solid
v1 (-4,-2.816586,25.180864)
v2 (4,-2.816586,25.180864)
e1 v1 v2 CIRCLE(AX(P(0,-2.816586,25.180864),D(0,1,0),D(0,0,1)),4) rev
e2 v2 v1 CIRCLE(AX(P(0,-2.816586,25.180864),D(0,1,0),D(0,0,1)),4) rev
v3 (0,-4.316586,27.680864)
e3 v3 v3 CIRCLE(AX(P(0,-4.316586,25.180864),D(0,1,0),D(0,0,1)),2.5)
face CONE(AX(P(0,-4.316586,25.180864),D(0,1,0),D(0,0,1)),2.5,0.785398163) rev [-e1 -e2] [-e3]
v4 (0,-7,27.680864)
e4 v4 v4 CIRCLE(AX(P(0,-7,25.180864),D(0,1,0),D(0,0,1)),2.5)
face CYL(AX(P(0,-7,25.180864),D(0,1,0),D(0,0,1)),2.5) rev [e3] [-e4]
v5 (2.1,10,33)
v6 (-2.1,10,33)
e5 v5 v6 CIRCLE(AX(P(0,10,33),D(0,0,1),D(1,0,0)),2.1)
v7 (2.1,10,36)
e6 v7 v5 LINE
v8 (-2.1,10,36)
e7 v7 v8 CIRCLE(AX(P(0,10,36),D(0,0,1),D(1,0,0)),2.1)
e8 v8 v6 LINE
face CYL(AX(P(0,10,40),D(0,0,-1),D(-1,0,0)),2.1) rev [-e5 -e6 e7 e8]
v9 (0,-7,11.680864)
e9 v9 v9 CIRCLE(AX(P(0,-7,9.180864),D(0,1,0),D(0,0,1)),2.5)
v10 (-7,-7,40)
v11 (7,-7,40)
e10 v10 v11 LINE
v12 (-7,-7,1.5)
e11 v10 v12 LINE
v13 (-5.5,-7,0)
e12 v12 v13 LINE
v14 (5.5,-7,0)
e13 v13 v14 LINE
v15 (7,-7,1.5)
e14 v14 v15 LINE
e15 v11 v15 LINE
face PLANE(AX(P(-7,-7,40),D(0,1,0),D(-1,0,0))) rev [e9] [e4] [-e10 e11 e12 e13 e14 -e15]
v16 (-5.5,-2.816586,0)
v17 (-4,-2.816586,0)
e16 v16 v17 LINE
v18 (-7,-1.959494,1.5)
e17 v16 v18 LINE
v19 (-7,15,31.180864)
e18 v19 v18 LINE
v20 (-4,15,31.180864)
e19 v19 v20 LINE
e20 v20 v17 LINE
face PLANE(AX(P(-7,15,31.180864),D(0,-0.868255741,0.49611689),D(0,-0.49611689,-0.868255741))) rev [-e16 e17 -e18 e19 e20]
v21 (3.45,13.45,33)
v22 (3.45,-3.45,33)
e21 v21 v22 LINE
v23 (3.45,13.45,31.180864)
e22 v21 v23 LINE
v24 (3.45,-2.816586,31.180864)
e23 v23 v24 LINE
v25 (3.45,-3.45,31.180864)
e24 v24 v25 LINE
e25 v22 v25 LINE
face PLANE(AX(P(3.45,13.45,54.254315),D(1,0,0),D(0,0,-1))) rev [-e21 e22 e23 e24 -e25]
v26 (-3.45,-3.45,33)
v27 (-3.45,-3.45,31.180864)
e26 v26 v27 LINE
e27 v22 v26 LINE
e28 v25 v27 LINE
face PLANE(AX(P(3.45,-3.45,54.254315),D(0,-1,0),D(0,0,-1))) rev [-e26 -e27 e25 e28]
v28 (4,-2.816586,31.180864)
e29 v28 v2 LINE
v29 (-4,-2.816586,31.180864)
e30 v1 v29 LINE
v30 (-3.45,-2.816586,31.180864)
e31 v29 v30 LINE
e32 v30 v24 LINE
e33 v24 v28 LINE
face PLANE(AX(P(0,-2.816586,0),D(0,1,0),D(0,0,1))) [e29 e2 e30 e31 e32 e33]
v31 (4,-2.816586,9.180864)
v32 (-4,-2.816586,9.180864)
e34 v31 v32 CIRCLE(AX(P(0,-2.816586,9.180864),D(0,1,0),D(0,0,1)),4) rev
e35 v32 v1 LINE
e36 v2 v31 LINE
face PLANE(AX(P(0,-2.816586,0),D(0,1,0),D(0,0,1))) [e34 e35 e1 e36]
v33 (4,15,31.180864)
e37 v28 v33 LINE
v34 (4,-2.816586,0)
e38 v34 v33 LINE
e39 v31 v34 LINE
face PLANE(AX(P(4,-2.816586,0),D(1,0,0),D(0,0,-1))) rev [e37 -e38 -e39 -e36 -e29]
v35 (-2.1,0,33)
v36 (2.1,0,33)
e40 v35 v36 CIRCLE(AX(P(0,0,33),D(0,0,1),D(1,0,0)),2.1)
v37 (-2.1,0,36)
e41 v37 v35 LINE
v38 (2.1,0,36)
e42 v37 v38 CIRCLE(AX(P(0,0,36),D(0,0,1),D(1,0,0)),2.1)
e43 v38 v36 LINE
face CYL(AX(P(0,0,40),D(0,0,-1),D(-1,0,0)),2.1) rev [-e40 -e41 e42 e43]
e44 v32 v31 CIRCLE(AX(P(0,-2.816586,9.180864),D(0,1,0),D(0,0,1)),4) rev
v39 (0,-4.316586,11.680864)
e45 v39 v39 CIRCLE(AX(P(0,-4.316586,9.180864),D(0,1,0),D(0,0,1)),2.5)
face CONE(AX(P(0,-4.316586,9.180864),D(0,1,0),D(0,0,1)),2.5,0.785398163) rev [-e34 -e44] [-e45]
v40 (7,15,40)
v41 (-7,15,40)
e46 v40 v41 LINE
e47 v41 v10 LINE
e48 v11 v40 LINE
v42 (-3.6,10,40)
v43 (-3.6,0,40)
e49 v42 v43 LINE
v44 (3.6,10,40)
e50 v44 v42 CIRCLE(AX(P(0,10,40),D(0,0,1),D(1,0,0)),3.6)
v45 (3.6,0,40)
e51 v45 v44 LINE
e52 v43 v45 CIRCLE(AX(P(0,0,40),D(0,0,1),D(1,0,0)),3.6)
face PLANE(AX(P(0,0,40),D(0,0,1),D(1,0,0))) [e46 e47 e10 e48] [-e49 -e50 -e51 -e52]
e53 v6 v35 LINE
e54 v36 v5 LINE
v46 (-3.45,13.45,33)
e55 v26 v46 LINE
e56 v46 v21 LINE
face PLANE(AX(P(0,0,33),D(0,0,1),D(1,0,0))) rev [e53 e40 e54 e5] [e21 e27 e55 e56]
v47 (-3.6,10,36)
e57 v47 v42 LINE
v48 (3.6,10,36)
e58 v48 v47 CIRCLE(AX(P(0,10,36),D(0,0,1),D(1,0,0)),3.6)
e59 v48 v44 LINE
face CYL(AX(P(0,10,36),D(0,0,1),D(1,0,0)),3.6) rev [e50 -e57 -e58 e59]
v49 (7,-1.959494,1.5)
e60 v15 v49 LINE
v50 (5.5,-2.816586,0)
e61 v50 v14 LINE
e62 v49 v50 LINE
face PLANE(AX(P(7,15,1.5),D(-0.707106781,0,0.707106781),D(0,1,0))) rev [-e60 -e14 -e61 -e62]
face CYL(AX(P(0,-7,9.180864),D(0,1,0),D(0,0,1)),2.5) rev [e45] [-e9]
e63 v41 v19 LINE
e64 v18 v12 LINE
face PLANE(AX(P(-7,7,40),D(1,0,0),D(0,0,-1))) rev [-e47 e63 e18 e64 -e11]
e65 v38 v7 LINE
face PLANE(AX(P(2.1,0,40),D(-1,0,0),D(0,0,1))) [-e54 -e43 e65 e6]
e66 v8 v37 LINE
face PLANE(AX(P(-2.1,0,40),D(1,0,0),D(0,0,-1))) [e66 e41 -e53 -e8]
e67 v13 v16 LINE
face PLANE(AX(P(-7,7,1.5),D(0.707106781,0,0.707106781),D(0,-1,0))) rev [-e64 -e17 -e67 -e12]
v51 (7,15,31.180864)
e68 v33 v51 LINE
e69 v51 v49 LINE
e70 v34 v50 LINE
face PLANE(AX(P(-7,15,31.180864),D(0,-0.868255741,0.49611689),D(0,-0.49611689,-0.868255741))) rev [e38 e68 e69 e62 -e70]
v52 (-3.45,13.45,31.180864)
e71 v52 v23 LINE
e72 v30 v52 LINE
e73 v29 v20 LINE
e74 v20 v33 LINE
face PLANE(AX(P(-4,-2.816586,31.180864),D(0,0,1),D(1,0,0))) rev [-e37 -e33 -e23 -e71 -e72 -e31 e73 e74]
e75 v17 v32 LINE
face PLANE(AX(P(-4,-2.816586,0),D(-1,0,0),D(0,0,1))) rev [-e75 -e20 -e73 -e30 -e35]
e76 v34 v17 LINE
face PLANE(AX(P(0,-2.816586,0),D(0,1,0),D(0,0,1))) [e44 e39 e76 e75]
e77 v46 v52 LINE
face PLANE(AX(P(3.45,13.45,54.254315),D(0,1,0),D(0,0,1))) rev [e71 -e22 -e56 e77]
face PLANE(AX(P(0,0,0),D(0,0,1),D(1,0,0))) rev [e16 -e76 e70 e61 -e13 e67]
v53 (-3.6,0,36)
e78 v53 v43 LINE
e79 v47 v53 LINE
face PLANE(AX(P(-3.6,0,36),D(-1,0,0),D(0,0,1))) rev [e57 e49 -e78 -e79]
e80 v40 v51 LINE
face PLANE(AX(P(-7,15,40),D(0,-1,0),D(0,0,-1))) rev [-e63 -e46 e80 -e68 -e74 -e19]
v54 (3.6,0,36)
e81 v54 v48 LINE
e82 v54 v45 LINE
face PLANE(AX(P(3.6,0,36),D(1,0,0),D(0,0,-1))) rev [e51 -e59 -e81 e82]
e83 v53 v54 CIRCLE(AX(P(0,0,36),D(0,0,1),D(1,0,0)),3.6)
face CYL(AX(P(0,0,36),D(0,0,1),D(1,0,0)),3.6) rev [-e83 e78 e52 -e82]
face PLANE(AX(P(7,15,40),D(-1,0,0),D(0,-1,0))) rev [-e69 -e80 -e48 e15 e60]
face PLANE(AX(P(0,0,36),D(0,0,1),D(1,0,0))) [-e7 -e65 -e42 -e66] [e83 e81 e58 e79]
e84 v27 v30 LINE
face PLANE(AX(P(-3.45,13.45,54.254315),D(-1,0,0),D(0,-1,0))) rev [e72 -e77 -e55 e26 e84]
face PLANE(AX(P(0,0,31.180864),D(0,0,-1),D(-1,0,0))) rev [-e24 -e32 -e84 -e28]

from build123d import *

# Parameters (mm, degrees)
SALIENTE_EXTRUIR1_DEPTH = 40
CORTAR_EXTRUIR1_DEPTH   = 4
CORTAR_EXTRUIR2_DEPTH   = 45.955533586
CROQUIS4_W              = 8
CROQUIS4_H              = 31.180864131
CORTAR_EXTRUIR3_DEPTH   = 17.81659
CROQUIS5_W              = 6.9
CROQUIS5_H              = 16.9
CORTAR_EXTRUIR4_DEPTH   = 1.819135869
CROQUIS6_R              = 2.5
CORTAR_EXTRUIR5_DEPTH   = 45.34445566
CHAFL_N1_SIZE           = 1.5
CHAFL_N2_SIZE           = 1.5


with BuildPart() as part:
    # Croquis1 → Saliente-Extruir1 (new body)
    with BuildSketch(Plane.XY):
        Polygon((-7, 7), (-7, 15), (7, 15), (7, 7), (7, -7), (-7, -7), align=None)
        with BuildLine():
            Line((-2.1, 0), (-2.1, 10))
            ThreePointArc((-2.1, 10), (0, 12.1), (2.1, 10))
            Line((2.1, 10), (2.1, 0))
            ThreePointArc((2.1, 0), (0, -2.1), (-2.1, 0))
        make_face(mode=Mode.SUBTRACT)
    extrude(amount=SALIENTE_EXTRUIR1_DEPTH)

    # Croquis2 → Cortar-Extruir1 (cut)
    with BuildSketch(Plane.XY.offset(40)):
        with BuildLine():
            Line((-3.6, 0), (-3.6, 10))
            ThreePointArc((-3.6, 10), (0, 13.6), (3.6, 10))
            Line((3.6, 10), (3.6, 0))
            ThreePointArc((3.6, 0), (0, -3.6), (-3.6, 0))
        make_face()
    extrude(amount=-CORTAR_EXTRUIR1_DEPTH, mode=Mode.SUBTRACT)

    # Croquis3 → Cortar-Extruir2 (cut, through all)
    with BuildSketch(Plane(origin=(7, 0, 0), x_dir=(0, 0, -1), z_dir=(1, 0, 0))):
        Polygon((0, 15), (-31.180864131, 15), (0, -2.81658631), align=None)
    extrude(amount=-CORTAR_EXTRUIR2_DEPTH, mode=Mode.SUBTRACT)

    # Croquis4 → Cortar-Extruir3 (cut)
    with BuildSketch(Plane(origin=(0, 15, 0), x_dir=(1, 0, 0), z_dir=(0, 1, 0))):
        with Locations((0, -15.590432066)):
            Rectangle(CROQUIS4_W, CROQUIS4_H)
    extrude(amount=-CORTAR_EXTRUIR3_DEPTH, mode=Mode.SUBTRACT)

    # Croquis5 → Cortar-Extruir4 (cut)
    with BuildSketch(Plane(origin=(0, 0, 31.180864131), x_dir=(-1, 0, 0), z_dir=(0, 0, -1))):
        with Locations((0, 5)):
            Rectangle(CROQUIS5_W, CROQUIS5_H)
    extrude(amount=-CORTAR_EXTRUIR4_DEPTH, mode=Mode.SUBTRACT)

    # Croquis6 → Cortar-Extruir5 (cut, through all)
    with BuildSketch(Plane(origin=(0, -2.81658631, 0), x_dir=(1, 0, 0), z_dir=(0, 1, 0))):
        with Locations(Location((0, -9.180864131, 0), (0, 0, 270))):
            Circle(CROQUIS6_R)
        with Locations(Location((0, -25.180864131, 0), (0, 0, 270))):
            Circle(CROQUIS6_R)
    extrude(amount=-CORTAR_EXTRUIR5_DEPTH, mode=Mode.SUBTRACT)

    # Chaflán1
    chafl_n1_edges = [part.edges().sort_by_distance(p)[0] for p in [
        (0, -2.81659, 6.680864131),
        (0, -2.81659, 22.680864131),
    ]]
    chamfer(chafl_n1_edges, length=CHAFL_N1_SIZE - 0.0001)  # a hair under: the kernel refuses the full size

    # Chaflán2
    chafl_n2_edges = [part.edges().sort_by_distance(p)[0] for p in [
        (-7, -4.908293155, 0),
        (7, -4.908293155, 0),
    ]]
    chamfer(chafl_n2_edges, length=CHAFL_N2_SIZE)


solid = part.part
